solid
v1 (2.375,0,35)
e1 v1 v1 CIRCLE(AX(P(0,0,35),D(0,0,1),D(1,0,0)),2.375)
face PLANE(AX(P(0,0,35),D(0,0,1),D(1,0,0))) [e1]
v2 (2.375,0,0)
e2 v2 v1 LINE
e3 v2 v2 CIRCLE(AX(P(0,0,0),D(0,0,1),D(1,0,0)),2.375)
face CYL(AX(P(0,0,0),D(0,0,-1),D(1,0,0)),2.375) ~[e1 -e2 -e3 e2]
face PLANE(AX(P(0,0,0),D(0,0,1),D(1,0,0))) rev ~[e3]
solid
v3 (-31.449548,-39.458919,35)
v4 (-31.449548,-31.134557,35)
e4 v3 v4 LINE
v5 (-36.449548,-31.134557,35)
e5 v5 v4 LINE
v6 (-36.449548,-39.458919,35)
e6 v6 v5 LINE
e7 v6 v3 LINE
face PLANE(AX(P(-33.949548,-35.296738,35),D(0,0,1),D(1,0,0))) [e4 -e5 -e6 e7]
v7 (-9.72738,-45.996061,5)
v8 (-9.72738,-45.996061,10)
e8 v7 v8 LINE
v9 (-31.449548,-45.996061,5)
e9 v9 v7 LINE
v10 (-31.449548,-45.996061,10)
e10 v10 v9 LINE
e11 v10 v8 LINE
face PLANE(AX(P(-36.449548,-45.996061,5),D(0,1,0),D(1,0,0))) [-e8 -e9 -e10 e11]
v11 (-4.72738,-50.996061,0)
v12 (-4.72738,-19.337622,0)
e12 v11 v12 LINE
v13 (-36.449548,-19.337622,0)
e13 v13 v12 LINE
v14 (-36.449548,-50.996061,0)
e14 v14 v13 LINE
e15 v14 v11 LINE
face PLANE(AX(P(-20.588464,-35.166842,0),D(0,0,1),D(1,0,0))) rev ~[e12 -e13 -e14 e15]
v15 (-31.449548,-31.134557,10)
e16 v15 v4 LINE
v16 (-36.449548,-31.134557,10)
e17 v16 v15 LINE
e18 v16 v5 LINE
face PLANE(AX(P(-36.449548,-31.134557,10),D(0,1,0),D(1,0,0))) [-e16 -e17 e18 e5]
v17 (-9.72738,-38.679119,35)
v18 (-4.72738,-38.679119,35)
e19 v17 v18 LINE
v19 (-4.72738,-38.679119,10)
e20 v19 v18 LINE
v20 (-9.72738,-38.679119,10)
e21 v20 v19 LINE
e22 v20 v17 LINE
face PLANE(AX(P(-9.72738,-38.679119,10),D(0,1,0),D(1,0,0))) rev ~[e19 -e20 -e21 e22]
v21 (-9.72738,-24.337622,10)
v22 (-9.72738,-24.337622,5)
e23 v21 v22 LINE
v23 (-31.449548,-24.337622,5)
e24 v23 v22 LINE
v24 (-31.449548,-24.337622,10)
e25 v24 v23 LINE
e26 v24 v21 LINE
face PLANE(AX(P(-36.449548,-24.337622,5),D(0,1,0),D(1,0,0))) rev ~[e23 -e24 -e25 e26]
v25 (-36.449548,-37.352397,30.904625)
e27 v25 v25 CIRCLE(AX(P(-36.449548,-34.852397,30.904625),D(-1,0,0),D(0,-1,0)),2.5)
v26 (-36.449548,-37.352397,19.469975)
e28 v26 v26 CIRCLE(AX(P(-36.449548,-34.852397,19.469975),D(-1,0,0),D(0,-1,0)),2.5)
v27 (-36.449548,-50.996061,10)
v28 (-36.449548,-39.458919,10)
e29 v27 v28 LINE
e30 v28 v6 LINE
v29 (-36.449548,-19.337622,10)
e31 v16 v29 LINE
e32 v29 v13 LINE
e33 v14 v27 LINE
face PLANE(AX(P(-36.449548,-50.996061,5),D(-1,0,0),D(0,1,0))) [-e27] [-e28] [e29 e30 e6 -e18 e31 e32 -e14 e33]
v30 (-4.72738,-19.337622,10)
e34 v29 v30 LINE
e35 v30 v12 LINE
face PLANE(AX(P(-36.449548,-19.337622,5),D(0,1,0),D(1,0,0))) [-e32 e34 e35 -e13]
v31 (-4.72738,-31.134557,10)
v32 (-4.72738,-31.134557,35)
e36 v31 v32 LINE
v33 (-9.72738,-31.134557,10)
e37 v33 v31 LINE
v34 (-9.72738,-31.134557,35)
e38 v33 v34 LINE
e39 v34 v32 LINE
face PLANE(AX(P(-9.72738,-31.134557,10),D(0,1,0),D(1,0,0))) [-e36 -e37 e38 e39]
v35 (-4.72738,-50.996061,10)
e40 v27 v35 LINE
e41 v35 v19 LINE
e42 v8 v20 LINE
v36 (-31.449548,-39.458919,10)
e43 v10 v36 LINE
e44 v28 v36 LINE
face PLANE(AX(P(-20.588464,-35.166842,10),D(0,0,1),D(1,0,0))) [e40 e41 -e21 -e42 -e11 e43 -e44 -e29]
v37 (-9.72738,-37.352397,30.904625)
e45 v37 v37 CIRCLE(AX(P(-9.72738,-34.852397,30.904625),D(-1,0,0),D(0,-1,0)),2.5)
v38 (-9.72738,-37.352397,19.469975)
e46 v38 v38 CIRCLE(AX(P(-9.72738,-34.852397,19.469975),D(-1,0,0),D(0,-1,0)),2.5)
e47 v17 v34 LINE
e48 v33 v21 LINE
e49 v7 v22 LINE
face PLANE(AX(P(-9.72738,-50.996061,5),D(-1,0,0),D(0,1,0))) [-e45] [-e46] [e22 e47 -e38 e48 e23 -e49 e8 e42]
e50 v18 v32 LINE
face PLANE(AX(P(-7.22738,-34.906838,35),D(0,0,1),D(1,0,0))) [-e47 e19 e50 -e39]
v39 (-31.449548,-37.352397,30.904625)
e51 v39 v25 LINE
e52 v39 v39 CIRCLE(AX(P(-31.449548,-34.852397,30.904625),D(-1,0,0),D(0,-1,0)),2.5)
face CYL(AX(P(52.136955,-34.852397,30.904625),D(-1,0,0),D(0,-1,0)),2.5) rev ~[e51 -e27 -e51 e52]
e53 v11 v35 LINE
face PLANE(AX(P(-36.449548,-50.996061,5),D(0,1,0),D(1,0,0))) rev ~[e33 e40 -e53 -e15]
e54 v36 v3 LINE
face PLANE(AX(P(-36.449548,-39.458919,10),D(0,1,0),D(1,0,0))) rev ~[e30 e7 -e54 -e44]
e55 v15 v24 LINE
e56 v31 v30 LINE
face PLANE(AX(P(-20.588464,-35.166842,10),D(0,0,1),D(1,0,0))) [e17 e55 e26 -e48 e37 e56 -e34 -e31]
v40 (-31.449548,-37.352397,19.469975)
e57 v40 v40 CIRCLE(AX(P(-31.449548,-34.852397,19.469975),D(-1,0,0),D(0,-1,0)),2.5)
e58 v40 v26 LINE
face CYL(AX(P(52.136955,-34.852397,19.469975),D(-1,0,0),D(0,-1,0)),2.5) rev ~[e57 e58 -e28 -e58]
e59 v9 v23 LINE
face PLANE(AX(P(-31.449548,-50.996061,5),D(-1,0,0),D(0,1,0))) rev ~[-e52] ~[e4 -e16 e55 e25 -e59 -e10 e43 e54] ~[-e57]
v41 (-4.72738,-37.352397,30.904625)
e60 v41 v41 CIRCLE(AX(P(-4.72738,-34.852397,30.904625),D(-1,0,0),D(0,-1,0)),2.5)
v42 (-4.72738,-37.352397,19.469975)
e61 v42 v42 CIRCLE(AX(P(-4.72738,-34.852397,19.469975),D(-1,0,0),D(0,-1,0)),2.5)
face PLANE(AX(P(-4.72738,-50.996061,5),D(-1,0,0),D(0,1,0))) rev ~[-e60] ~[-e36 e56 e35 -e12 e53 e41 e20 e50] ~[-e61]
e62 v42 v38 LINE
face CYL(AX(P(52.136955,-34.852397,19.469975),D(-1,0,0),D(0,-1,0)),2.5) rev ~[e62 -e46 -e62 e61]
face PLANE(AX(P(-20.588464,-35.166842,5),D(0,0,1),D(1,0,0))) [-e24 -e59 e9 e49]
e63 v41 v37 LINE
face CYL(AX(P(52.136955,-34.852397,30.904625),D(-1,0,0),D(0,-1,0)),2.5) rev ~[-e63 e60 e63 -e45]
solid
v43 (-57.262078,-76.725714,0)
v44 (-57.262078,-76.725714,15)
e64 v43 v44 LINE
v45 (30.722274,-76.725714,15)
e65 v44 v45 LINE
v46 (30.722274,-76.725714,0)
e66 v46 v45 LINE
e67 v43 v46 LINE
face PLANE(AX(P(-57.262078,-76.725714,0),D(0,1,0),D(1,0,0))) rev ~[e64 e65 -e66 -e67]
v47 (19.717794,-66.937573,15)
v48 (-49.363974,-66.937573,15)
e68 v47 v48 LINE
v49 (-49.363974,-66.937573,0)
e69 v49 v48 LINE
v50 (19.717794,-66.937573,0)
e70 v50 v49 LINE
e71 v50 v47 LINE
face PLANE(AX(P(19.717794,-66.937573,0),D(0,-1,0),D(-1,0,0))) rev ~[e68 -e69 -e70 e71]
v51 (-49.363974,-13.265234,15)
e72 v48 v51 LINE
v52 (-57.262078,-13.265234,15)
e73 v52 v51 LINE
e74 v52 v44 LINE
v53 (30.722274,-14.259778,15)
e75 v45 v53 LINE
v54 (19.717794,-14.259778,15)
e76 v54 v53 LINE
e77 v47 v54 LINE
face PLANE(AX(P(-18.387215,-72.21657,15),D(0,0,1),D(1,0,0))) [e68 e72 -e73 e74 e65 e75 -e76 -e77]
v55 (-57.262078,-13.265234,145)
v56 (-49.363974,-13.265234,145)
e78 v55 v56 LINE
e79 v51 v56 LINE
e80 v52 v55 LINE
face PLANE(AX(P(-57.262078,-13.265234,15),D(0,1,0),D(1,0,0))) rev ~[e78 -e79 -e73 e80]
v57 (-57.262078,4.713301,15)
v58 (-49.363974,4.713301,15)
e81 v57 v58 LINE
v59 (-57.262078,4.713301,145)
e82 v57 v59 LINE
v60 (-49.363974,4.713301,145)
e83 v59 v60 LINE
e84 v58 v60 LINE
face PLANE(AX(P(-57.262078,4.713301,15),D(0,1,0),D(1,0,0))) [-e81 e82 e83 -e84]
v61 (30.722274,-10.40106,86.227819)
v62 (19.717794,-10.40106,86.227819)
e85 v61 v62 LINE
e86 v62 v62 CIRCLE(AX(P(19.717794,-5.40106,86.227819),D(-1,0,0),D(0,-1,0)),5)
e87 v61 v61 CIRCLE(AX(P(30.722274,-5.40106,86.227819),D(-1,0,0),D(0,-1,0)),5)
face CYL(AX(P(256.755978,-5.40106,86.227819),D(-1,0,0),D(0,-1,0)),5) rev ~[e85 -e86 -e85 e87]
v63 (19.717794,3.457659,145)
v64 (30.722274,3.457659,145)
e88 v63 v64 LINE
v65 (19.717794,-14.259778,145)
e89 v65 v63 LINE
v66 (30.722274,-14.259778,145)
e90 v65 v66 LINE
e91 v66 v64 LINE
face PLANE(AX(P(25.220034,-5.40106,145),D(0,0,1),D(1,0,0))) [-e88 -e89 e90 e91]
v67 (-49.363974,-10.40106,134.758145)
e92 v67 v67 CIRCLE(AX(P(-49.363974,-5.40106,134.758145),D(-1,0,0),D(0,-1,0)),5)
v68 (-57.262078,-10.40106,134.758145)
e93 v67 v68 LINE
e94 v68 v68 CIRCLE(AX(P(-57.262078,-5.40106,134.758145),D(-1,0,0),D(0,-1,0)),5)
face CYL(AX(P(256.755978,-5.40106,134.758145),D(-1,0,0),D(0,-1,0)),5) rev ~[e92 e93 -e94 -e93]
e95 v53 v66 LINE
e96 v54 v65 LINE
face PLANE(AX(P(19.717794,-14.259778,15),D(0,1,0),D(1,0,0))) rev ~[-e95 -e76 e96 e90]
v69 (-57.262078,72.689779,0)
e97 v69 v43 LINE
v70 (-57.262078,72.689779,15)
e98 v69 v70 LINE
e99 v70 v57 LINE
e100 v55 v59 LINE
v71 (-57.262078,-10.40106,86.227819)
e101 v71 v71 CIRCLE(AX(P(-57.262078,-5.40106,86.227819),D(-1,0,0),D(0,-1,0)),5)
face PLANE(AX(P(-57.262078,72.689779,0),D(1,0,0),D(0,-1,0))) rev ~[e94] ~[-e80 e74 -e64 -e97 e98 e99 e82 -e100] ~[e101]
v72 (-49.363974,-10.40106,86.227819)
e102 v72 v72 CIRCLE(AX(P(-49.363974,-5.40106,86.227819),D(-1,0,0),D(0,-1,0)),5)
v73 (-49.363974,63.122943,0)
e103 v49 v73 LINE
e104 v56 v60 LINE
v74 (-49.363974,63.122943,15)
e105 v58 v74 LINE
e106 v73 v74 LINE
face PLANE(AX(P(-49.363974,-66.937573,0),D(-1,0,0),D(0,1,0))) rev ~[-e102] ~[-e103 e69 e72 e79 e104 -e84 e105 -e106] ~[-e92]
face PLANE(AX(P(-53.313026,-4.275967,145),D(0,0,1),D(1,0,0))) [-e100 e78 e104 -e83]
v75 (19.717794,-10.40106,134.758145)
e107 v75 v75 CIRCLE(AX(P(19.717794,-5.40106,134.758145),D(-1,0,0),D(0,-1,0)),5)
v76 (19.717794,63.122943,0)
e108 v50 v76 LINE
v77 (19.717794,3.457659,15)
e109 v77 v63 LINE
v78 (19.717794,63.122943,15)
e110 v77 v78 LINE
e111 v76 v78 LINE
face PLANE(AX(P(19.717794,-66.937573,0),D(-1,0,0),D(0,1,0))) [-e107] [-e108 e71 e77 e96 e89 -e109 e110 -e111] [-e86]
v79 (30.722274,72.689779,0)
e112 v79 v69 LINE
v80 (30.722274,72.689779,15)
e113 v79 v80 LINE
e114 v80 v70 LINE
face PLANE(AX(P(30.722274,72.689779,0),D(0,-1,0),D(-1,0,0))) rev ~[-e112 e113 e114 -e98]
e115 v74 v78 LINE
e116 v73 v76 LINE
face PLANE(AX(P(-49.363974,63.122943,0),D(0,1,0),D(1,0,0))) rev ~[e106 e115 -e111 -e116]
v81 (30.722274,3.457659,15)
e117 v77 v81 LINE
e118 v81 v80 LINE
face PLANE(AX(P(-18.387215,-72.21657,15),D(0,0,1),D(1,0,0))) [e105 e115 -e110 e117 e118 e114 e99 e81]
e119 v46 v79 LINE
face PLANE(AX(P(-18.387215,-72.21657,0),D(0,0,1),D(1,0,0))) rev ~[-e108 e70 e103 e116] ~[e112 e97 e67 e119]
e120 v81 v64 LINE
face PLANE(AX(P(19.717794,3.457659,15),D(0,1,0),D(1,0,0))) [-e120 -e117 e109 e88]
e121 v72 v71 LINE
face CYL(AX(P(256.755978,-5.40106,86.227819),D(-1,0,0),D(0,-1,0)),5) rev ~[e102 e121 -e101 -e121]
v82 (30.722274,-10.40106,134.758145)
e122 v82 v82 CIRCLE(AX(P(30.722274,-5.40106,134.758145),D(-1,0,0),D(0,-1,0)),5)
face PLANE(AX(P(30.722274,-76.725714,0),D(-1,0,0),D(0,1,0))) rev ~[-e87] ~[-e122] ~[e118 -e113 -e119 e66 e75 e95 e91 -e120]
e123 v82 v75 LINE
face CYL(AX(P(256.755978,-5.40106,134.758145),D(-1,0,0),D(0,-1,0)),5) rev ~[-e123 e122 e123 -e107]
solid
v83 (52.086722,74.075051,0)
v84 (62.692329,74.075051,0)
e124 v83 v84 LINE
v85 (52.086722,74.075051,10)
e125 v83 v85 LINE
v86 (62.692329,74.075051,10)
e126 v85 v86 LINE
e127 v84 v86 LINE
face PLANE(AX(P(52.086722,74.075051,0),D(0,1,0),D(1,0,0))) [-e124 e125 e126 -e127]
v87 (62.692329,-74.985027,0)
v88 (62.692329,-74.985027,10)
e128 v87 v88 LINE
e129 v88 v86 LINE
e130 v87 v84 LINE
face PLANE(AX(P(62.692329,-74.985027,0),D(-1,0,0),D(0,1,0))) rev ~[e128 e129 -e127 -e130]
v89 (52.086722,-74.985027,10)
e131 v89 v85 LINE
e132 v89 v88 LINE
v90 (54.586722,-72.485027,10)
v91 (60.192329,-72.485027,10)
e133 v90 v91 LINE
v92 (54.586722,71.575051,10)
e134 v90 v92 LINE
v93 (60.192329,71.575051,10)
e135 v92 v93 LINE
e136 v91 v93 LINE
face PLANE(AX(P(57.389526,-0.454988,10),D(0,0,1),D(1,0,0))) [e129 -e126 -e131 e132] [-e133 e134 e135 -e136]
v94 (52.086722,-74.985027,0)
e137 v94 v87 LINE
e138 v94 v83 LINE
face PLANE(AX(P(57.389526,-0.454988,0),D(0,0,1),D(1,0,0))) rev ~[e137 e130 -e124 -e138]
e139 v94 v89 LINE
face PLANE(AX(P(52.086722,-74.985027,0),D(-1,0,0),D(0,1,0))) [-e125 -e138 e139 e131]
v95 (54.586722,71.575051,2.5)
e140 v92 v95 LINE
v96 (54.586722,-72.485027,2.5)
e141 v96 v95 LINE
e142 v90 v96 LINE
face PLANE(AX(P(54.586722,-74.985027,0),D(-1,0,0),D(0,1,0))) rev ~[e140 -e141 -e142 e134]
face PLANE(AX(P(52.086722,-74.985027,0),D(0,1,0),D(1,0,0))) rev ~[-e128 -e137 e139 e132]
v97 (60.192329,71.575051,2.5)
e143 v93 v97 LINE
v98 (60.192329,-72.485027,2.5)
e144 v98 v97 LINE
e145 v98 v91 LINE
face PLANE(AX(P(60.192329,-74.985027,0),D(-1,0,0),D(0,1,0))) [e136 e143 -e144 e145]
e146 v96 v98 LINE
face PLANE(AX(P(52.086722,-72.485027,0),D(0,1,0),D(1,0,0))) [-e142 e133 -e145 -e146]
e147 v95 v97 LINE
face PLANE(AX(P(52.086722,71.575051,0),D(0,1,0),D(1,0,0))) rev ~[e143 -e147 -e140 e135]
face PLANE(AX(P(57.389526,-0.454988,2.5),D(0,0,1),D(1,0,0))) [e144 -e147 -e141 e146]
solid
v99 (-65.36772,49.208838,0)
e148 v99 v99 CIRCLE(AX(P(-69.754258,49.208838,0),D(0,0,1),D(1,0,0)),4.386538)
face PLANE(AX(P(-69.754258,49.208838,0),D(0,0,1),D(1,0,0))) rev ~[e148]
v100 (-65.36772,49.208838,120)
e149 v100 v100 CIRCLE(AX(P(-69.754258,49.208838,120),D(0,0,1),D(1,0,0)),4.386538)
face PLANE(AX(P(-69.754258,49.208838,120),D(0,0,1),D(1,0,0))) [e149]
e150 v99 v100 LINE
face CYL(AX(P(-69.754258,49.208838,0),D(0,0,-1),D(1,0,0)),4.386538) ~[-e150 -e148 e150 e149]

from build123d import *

# Parameters (mm, degrees)
F0_W      = 99.0480743349
F0_H      = 131.0261934996
F1_DEPTH  = 25
F3_D      = 80
F4_W      = 10.3947483003
F4_H      = 28.5077588633
F5_DEPTH  = 55
F7_D      = 10
F8_R      = 4.3865377981
F9_DEPTH  = 120
F10_DEPTH = 60
F12_D     = 10
F13_DEPTH = 5
F14_DEPTH = 5
F15_DEPTH = 5
F16_DEPTH = 10
F17_DEPTH = 10
F18_W     = 10.6056071818
F18_H     = 149.0600779653
F19_DEPTH = 10
F20_T     = -2.5
F20_2_T   = -2.5
F22_W     = 7.8981034458
F22_H     = 8.4575563669
F22_H_2   = 130.0605162978
F22_H_3   = 9.5668360591
F22_W_2   = 69.0817683935
F22_W_3   = 11.004479602
F22_H_4   = 9.7881406546
F23_DEPTH = 15
F24_W     = 7.8981034458
F24_H     = 17.9785350338
F24_W_2   = 11.004479602
F24_H_2   = 17.717437353
F25_DEPTH = 130
F27_D     = 10
F28_W     = 31.7221675068
F28_H     = 31.6584389657
F29_DEPTH = 5
F30_DEPTH = 5
F31_T     = -5
F32_W     = 5
F32_H     = 8.3243623376
F32_H_2   = 7.5445622206
F33_DEPTH = 25
F35_D     = 5
F36_R     = 2.375
F37_DEPTH = 35


# Not quite as in the source:
# - a shell that OpenCascade refuses in one call is made with other operations: the cavity is built on its own and cut out
# - a feature names something its author has since deleted; it is built from what else it names


with BuildPart() as f1:
    # F0 (on Top) → F1 (new body)
    with BuildSketch(Plane.XY):
        with Locations((-1.6936603934, -0.8678138256)):
            Rectangle(F0_W, F0_H)
    extrude(amount=F1_DEPTH)

    # F3 (through all)
    with Locations(Plane.XY.offset(25)):
        with Locations((0, 1.7684714403)):
            Hole(F3_D / 2)

    # F4 (on face) → F5 (join)
    with BuildSketch(Plane.XY.offset(25)):
        with Locations((-46.0203234106, -0.7940088399)):
            Rectangle(F4_W, F4_H)
        with BuildLine():
            Line((47.8303767741, -17.6419820637), (47.8303767741, 13.5616535332))
            Line((47.8303767741, 13.5616535332), (38.2219944027, 13.5616535332))
            ThreePointArc((38.2219944027, 13.5616535332), (39.5530009994, 7.7317014329), (40, 1.7684714403))
            ThreePointArc((40, 1.7684714403), (39.5530009994, -4.1947585523), (38.2219944027, -10.0247106526))
            Line((38.2219944027, -10.0247106526), (38.2219944027, -17.6419820637))
            Line((38.2219944027, -17.6419820637), (47.8303767741, -17.6419820637))
        make_face()
    extrude(amount=F5_DEPTH)

    # F7 (through all)
    with Locations(Plane(origin=(-51.2176975608, 0, 0), x_dir=(0, -1, 0), z_dir=(-1, 0, 0))):
        with Locations((0, 69.6488469839)):
            Hole(F7_D / 2)

    # F10 (add): a face of the model
    f10_faces = [f1.faces().sort_by_distance(p)[0] for p in [
        (-46.0203234106, -0.7940088399, 80),
    ]]
    extrude(f10_faces, amount=F10_DEPTH)

    # F12 (through all)
    with Locations(Plane(origin=(-51.2176975608, 0, 0), x_dir=(0, -1, 0), z_dir=(-1, 0, 0))):
        with Locations((0, 129.8670172691)):
            Hole(F12_D / 2)

    # F13 (add): a face of the model
    f13_faces = [f1.faces().sort_by_distance(p)[0] for p in [
        (-46.0203234106, -15.0478882715, 82.5),
    ]]
    extrude(f13_faces, amount=-F13_DEPTH)

    # F14 (add): a face of the model
    f14_faces = [f1.faces().sort_by_distance(p)[0] for p in [
        (43.0261855884, -17.6419820637, 52.5),
    ]]
    extrude(f14_faces, amount=-F14_DEPTH)

    # F15 (add): a face of the model
    f15_faces = [f1.faces().sort_by_distance(p)[0] for p in [
        (46.1878669746, 39.1034682287, 25),
    ]]
    extrude(f15_faces, amount=-F15_DEPTH)

    # F16 (add): a face of the model
    f16_faces = [f1.faces().sort_by_distance(p)[0] for p in [
        (46.1878669746, 39.1034682287, 25),
    ]]
    extrude(f16_faces, amount=-F16_DEPTH)

    # F17 (add): a face of the model
    f17_faces = [f1.faces().sort_by_distance(p)[0] for p in [
        (46.1878669746, 39.1034682287, 25),
    ]]
    extrude(f17_faces, amount=-F17_DEPTH)

    # F20#2: a shell. OpenCascade refuses it in one call, so the cavity is built on its own and cut out:
    # the body offset inwards by the wall thickness, plus a prism from it out through each open face.
    f20_2_core = offset(f1.part, amount=F20_2_T, mode=Mode.PRIVATE)
    f20_2_exits = [f20_2_core.faces().sort_by_distance(p)[0] for p in [
        (-2.773323, -45.938788, 22.5),
        (-2.856032, 45.670287, 22.5),
    ]]
    add(f20_2_core, mode=Mode.SUBTRACT)
    extrude(f20_2_exits, amount=-F20_2_T, mode=Mode.SUBTRACT)


with BuildPart() as f9:
    # F8 (on Top) → F9 (new body)
    with BuildSketch(Plane.XY):
        with Locations((-69.7542577982, 49.2088384926)):
            Circle(F8_R)
    extrude(amount=F9_DEPTH)


with BuildPart() as f19:
    # F18 (on Top) → F19 (new body)
    with BuildSketch(Plane.XY):
        with Locations((57.3895256966, -0.4549883306)):
            Rectangle(F18_W, F18_H)
    extrude(amount=F19_DEPTH)

    # F20
    f20_openings = [f19.faces().sort_by_distance(p)[0] for p in [
        (57.389526, -0.454988, 10),
    ]]
    offset(amount=F20_T, openings=f20_openings)


with BuildPart() as f23:
    # F22 (on Top) → F23 (new body)
    with BuildSketch(Plane.XY):
        Polygon((-49.3639744818, -75.395129621), (-57.2620779276, -75.395129621), (-57.2620779276, -76.7257139087), (19.7177939117, -76.7257139087), (19.7177939117, -66.9375732541), (-49.3639744818, -66.9375732541), align=None)
        with Locations((-53.3130262047, -71.1663514376)):
            Rectangle(F22_W, F22_H)
        with Locations((-53.3130262047, -1.9073151052)):
            Rectangle(F22_W, F22_H_2)
        with Locations((-53.3130262047, 67.9063610733)):
            Rectangle(F22_W, F22_H_3)
        with Locations((-14.8230902851, 67.9063610733)):
            Rectangle(F22_W_2, F22_H_3)
        with Locations((25.2200337127, 67.9063610733)):
            Rectangle(F22_W_3, F22_H_3)
        with Locations((25.2200337127, -1.9073151052)):
            Rectangle(F22_W_3, F22_H_2)
        with Locations((25.2200337127, -71.8316435814)):
            Rectangle(F22_W_3, F22_H_4)
    extrude(amount=F23_DEPTH)

    # F24 (on face) → F25 (join)
    with BuildSketch(Plane.XY.offset(15)):
        with Locations((-53.3130262047, -4.2759669013)):
            Rectangle(F24_W, F24_H)
        with Locations((25.2200337127, -5.4010595195)):
            Rectangle(F24_W_2, F24_H_2)
    extrude(amount=F25_DEPTH)

    # F27 (through all)
    with Locations(Plane.YZ.offset(30.7222735137)):
        with Locations((-5.4010595195, 134.7581446171), (-5.4010595195, 86.2278193235)):
            Hole(F27_D / 2)


with BuildPart() as f29:
    # F28 (on Top) → F29 (new body)
    with BuildSketch(Plane.XY):
        with Locations((-20.5884641036, -35.1668419316)):
            Rectangle(F28_W, F28_H)
    extrude(amount=F29_DEPTH)

    # F30 (add): a face of the model
    f30_faces = [f29.faces().sort_by_distance(p)[0] for p in [
        (-20.5884641036, -35.1668419316, 5),
    ]]
    extrude(f30_faces, amount=F30_DEPTH)

    # F31
    f31_openings = [f29.faces().sort_by_distance(p)[0] for p in [
        (-20.588464, -35.166842, 10),
    ]]
    offset(amount=F31_T, openings=f31_openings)

    # F32 (on face) → F33 (join)
    with BuildSketch(Plane.XY.offset(10)):
        with Locations((-33.949547857, -35.2967381477)):
            Rectangle(F32_W, F32_H)
        with Locations((-7.2273803502, -34.9068380892)):
            Rectangle(F32_W, F32_H_2)
    extrude(amount=F33_DEPTH)

    # F35 (through all)
    with Locations(Plane.YZ.offset(-4.7273803502)):
        with Locations((-34.8523966968, 30.9046246111), (-34.8523966968, 19.4699745625)):
            Hole(F35_D / 2)


with BuildPart() as f37:
    # F36 (on Top) → F37 (new body)
    with BuildSketch(Plane.XY):
        Circle(F36_R)
    extrude(amount=F37_DEPTH)


solid = Compound([f9.part, f19.part, f23.part, f29.part, f37.part])
